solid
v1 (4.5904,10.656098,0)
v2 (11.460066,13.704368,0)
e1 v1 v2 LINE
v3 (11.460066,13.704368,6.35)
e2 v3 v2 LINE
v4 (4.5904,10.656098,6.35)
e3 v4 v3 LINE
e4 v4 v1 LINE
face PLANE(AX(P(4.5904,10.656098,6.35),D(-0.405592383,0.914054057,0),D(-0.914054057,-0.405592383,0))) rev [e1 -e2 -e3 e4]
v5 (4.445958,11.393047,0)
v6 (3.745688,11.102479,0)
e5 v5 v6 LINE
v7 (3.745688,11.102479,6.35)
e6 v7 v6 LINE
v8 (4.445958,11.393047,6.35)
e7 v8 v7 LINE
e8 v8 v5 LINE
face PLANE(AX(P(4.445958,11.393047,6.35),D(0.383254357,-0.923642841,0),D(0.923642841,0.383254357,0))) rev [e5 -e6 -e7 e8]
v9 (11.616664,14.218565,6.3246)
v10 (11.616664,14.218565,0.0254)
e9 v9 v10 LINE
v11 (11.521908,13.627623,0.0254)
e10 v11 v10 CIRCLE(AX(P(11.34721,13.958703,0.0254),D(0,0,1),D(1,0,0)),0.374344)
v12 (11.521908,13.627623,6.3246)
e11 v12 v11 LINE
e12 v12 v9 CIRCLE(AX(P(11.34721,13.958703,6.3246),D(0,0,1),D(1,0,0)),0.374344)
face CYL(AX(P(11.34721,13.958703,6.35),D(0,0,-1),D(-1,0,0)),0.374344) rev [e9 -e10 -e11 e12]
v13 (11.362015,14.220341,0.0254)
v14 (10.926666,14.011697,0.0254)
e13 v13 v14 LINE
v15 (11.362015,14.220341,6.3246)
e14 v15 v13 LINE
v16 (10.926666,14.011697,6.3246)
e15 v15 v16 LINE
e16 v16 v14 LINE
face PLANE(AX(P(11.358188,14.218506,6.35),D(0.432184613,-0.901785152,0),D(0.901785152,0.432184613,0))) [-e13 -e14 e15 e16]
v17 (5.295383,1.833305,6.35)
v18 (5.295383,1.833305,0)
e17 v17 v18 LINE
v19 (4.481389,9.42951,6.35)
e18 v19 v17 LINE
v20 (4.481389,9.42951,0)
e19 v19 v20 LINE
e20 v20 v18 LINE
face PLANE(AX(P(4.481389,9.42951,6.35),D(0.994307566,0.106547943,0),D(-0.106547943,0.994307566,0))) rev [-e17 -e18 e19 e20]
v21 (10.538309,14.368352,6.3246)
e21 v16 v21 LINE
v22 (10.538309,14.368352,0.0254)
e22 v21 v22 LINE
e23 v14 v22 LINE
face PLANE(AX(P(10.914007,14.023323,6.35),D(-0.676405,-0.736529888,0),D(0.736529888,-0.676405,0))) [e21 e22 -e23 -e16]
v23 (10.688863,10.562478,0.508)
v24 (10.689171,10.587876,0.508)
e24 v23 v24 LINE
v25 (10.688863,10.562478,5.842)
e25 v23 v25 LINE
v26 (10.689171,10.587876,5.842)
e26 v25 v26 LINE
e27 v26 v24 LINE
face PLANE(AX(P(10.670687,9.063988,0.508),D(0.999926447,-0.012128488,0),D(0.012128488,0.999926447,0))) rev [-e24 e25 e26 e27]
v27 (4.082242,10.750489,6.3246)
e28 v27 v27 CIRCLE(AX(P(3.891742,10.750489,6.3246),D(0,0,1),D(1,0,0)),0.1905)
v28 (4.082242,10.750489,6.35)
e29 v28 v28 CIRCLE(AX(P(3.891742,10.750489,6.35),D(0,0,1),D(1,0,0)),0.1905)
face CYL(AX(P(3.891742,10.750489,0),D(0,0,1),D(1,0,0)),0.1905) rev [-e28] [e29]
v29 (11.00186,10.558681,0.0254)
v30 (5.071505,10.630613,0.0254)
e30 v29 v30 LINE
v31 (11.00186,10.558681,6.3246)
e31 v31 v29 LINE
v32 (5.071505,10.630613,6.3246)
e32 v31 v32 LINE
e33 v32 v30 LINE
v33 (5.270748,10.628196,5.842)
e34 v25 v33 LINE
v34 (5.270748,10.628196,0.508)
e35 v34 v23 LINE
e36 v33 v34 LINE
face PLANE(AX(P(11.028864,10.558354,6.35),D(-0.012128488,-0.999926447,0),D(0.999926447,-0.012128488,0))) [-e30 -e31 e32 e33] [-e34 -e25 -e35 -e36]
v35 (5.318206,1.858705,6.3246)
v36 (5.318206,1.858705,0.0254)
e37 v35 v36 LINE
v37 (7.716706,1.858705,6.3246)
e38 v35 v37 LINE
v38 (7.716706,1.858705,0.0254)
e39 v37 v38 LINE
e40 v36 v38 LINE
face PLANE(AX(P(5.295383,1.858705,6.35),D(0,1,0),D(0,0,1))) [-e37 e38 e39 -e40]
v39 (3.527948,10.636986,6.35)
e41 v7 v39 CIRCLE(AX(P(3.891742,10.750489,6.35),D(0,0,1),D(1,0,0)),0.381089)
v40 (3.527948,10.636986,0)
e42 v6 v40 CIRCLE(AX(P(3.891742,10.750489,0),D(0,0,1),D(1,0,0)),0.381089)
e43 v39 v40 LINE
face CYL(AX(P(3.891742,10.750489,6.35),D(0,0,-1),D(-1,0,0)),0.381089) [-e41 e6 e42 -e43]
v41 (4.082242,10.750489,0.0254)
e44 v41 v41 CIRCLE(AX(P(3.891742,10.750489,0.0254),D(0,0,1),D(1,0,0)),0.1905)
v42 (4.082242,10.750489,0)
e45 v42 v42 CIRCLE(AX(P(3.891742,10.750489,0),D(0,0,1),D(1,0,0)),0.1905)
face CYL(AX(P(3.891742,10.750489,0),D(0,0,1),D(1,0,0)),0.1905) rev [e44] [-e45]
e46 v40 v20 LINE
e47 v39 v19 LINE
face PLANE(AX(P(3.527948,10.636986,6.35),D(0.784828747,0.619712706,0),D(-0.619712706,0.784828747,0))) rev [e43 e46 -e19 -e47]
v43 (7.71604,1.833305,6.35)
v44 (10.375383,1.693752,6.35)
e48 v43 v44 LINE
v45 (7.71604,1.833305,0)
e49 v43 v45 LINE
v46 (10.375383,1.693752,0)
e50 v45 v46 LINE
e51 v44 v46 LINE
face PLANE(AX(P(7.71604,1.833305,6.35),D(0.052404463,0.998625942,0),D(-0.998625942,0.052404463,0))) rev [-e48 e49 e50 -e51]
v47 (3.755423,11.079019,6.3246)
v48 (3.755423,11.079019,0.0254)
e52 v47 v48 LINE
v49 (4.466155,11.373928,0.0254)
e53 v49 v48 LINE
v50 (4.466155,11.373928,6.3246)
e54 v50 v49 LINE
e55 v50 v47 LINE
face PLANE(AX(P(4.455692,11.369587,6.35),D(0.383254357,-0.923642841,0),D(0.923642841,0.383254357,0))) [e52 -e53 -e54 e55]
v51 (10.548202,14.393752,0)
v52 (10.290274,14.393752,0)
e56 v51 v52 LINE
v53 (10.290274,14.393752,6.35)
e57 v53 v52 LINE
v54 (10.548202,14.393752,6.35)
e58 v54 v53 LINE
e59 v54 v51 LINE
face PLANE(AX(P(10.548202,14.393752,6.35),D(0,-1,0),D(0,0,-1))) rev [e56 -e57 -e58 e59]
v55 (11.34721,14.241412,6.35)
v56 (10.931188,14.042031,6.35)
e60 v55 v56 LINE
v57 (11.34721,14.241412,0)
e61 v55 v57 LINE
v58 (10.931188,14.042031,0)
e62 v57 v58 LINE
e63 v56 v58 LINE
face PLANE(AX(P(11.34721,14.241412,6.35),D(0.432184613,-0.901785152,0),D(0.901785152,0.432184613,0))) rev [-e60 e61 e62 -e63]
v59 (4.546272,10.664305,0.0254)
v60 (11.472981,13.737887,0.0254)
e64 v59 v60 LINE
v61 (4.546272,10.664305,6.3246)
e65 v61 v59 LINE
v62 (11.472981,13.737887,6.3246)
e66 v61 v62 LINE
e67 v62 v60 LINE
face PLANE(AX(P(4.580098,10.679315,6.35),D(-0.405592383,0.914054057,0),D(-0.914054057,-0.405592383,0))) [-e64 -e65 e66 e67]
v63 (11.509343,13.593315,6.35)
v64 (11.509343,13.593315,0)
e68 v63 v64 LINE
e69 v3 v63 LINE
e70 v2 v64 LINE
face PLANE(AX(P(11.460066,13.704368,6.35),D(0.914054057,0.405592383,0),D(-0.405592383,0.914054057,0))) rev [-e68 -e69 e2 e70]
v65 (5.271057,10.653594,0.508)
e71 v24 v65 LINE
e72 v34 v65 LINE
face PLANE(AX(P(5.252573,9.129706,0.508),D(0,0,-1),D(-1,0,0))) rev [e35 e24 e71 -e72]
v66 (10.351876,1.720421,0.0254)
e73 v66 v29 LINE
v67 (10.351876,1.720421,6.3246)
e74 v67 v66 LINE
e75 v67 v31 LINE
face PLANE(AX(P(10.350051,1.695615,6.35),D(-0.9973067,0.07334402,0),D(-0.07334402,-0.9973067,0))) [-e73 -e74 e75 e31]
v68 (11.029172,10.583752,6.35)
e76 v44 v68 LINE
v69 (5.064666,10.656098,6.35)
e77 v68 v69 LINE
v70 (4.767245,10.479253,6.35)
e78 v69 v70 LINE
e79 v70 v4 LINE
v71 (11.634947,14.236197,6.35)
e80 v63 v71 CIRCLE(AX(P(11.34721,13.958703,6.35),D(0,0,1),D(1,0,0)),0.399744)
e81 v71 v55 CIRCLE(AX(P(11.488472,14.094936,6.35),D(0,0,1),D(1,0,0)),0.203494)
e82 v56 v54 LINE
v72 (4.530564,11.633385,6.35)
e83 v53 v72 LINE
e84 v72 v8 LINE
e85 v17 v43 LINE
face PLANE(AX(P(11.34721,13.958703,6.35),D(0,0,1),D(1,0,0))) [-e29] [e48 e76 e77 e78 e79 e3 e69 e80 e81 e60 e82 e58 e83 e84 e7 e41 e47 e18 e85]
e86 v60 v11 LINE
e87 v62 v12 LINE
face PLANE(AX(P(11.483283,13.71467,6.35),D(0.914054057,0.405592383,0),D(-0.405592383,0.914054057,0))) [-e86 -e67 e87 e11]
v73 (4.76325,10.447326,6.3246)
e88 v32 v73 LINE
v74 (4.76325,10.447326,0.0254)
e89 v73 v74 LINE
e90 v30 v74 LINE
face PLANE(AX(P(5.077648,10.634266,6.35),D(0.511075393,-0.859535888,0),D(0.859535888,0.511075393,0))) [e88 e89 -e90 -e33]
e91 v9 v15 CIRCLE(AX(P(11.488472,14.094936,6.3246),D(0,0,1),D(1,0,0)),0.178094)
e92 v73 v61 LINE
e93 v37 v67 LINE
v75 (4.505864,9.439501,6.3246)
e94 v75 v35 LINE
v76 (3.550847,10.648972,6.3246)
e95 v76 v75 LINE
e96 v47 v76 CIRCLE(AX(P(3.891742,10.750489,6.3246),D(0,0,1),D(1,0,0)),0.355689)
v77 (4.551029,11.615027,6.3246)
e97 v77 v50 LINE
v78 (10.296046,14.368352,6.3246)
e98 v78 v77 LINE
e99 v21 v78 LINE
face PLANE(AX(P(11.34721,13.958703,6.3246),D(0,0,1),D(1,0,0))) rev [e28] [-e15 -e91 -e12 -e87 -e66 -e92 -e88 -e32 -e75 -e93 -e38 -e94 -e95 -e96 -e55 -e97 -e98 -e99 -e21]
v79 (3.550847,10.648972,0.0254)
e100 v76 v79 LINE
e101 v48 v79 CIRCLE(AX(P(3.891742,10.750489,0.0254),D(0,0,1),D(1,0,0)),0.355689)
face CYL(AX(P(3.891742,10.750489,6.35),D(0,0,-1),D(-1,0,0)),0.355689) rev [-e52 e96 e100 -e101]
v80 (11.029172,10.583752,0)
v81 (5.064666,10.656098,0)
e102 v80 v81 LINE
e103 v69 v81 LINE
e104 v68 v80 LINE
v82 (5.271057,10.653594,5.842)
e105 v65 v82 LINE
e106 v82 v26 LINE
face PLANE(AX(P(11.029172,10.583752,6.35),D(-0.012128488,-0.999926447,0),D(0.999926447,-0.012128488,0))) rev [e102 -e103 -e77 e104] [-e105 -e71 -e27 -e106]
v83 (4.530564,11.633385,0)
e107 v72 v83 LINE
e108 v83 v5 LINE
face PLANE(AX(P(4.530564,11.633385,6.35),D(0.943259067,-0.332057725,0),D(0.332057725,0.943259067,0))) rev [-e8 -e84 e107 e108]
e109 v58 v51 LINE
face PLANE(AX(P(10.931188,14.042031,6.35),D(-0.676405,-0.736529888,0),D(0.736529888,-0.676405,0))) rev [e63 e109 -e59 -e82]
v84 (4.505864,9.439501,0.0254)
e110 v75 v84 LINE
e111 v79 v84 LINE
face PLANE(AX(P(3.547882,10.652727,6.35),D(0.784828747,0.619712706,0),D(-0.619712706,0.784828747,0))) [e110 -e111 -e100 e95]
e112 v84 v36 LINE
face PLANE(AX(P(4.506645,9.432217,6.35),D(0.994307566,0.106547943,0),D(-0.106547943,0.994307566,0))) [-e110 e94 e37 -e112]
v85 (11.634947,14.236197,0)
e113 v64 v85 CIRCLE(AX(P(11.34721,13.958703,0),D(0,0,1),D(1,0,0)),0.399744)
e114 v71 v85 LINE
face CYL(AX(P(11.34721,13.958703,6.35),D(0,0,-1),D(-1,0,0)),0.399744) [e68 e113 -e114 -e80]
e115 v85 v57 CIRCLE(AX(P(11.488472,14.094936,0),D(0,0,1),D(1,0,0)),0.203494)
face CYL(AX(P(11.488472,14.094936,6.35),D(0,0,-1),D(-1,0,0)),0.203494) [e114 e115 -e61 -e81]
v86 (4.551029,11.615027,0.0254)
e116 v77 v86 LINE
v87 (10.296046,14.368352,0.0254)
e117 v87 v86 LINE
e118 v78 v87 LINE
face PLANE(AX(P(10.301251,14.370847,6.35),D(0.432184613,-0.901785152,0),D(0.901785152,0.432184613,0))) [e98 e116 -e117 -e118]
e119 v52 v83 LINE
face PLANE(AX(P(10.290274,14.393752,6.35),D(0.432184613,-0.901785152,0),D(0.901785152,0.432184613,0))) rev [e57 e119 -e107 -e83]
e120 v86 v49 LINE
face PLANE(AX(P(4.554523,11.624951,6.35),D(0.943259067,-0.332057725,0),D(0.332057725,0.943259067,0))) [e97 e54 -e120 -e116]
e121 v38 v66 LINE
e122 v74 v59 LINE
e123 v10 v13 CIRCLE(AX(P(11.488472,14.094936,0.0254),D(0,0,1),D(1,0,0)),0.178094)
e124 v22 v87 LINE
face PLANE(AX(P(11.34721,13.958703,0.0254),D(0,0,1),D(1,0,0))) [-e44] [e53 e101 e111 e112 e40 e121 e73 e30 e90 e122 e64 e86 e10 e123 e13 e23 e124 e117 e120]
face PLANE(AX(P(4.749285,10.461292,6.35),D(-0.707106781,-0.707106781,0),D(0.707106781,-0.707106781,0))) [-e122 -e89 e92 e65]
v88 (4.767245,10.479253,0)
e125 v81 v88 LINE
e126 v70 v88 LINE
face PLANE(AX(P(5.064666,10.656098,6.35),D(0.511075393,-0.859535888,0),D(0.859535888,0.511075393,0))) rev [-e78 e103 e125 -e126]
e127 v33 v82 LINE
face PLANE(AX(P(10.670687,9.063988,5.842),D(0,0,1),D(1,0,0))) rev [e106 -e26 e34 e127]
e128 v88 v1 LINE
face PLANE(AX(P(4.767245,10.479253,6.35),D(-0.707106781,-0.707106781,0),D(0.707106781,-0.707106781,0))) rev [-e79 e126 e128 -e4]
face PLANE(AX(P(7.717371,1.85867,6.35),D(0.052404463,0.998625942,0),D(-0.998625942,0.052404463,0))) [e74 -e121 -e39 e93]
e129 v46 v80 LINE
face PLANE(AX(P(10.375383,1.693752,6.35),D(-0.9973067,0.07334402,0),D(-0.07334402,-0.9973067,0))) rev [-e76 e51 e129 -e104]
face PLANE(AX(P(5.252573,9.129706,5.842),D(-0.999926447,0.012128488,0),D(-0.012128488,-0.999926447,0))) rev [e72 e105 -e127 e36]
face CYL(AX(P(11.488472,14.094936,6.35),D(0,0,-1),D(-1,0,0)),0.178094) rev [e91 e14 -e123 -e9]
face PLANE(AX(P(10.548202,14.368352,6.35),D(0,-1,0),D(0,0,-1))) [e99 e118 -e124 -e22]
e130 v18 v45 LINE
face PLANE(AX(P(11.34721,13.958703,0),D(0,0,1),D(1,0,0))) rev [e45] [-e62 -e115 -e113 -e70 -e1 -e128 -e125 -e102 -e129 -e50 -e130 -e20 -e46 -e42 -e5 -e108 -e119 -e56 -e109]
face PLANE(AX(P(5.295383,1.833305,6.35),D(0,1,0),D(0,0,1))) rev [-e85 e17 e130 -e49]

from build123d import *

# Parameters (mm, degrees)
BOSS_EXTRUDE1_DEPTH = 6.35
SHELL1_START        = 0.0254
SHELL1_DEPTH        = 6.2992
SKETCH3_W           = 5.418512696
SKETCH3_H           = 5.334
CUT_EXTRUDE2_DEPTH  = 1.524
SKETCH4_R           = 0.1905
CUT_EXTRUDE3_DEPTH  = 20.633989303


# Read off the part's stored shape, not the designer's step: Shell1
with BuildPart() as part:
    # Sketch1 → Boss-Extrude1 (new body)
    with BuildSketch(Plane.XY):
        with BuildLine():
            Line((7.716040042, 1.833305163), (10.375382868, 1.693751976))
            Line((10.375382868, 1.693751976), (11.029172055, 10.583751976))
            Line((11.029172055, 10.583751976), (5.064666493, 10.656097731))
            Line((5.064666493, 10.656097731), (4.767245057, 10.479252552))
            Line((4.767245057, 10.479252552), (4.590399878, 10.656097731))
            Line((4.590399878, 10.656097731), (11.46006589, 13.704368441))
            Line((11.46006589, 13.704368441), (11.509343406, 13.593315288))
            ThreePointArc((11.509343406, 13.593315288), (11.739536715, 13.882052013), (11.634947175, 14.236197299))
            ThreePointArc((11.634947175, 14.236197299), (11.492158572, 14.298396741), (11.347210136, 14.241411598))
            Line((11.347210136, 14.241411598), (10.931187512, 14.042030874))
            Line((10.931187512, 14.042030874), (10.548202312, 14.393751976))
            Line((10.548202312, 14.393751976), (10.290273504, 14.393751976))
            Line((10.290273504, 14.393751976), (4.530564215, 11.633385245))
            Line((4.530564215, 11.633385245), (4.445957531, 11.39304745))
            Line((4.445957531, 11.39304745), (3.74568803, 11.102479142))
            ThreePointArc((3.74568803, 11.102479142), (3.54655055, 10.911956466), (3.527947792, 10.636986353))
            Line((3.527947792, 10.636986353), (4.481389231, 9.429510304))
            Line((4.481389231, 9.429510304), (5.295382868, 1.833305163))
            Line((5.295382868, 1.833305163), (7.716040042, 1.833305163))
        make_face()
    extrude(amount=BOSS_EXTRUDE1_DEPTH)

    # Shell1 outline → Shell1 (cut)
    with BuildSketch(Plane.XY.offset(SHELL1_START)):
        with BuildLine():
            Line((5.318206472, 1.858705163), (7.716706036, 1.858705163))
            Line((7.716706036, 1.858705163), (10.351875533, 1.720420509))
            Line((10.351875533, 1.720420509), (11.001859717, 10.558681389))
            Line((11.001859717, 10.558681389), (5.071504797, 10.630612918))
            Line((5.071504797, 10.630612918), (4.76325019, 10.447326395))
            Line((4.76325019, 10.447326395), (4.546271575, 10.664305009))
            Line((4.546271575, 10.664305009), (11.472980817, 13.737887461))
            Line((11.472980817, 13.737887461), (11.521908422, 13.627622875))
            ThreePointArc((11.521908422, 13.627622875), (11.716832945, 13.899435369), (11.616664188, 14.218565158))
            ThreePointArc((11.616664188, 14.218565158), (11.489713166, 14.273025818), (11.362015112, 14.220340596))
            Line((11.362015112, 14.220340596), (10.926665769, 14.011697454))
            Line((10.926665769, 14.011697454), (10.538308623, 14.368351976))
            Line((10.538308623, 14.368351976), (10.296045707, 14.368351976))
            Line((10.296045707, 14.368351976), (4.551029407, 11.615026927))
            Line((4.551029407, 11.615026927), (4.466154882, 11.373928288))
            Line((4.466154882, 11.373928288), (3.755422691, 11.079018614))
            ThreePointArc((3.755422691, 11.079018614), (3.570543876, 10.903284548), (3.550847191, 10.64897238))
            Line((3.550847191, 10.64897238), (4.505864047, 9.439501161))
            Line((4.505864047, 9.439501161), (5.318206472, 1.858705163))
        make_face()
    extrude(amount=SHELL1_DEPTH, mode=Mode.SUBTRACT)

    # Sketch3 → Cut-Extrude2 (cut)
    with BuildSketch(Plane(origin=(0.12997786, 10.715952445, 0), x_dir=(0.9999264471855748, -0.012128487903857954, 0), z_dir=(0.012128487903857952, 0.9999264471855747, 0))):
        with Locations((7.850713163, -3.175)):
            Rectangle(SKETCH3_W, SKETCH3_H)
    extrude(amount=-CUT_EXTRUDE2_DEPTH, mode=Mode.SUBTRACT)

    # Sketch4 → Cut-Extrude3 (cut, through all)
    with BuildSketch(Plane.XY.offset(6.35)):
        with Locations((3.89174221, 10.750488628)):
            Circle(SKETCH4_R)
    extrude(amount=-CUT_EXTRUDE3_DEPTH, mode=Mode.SUBTRACT)


solid = part.part
